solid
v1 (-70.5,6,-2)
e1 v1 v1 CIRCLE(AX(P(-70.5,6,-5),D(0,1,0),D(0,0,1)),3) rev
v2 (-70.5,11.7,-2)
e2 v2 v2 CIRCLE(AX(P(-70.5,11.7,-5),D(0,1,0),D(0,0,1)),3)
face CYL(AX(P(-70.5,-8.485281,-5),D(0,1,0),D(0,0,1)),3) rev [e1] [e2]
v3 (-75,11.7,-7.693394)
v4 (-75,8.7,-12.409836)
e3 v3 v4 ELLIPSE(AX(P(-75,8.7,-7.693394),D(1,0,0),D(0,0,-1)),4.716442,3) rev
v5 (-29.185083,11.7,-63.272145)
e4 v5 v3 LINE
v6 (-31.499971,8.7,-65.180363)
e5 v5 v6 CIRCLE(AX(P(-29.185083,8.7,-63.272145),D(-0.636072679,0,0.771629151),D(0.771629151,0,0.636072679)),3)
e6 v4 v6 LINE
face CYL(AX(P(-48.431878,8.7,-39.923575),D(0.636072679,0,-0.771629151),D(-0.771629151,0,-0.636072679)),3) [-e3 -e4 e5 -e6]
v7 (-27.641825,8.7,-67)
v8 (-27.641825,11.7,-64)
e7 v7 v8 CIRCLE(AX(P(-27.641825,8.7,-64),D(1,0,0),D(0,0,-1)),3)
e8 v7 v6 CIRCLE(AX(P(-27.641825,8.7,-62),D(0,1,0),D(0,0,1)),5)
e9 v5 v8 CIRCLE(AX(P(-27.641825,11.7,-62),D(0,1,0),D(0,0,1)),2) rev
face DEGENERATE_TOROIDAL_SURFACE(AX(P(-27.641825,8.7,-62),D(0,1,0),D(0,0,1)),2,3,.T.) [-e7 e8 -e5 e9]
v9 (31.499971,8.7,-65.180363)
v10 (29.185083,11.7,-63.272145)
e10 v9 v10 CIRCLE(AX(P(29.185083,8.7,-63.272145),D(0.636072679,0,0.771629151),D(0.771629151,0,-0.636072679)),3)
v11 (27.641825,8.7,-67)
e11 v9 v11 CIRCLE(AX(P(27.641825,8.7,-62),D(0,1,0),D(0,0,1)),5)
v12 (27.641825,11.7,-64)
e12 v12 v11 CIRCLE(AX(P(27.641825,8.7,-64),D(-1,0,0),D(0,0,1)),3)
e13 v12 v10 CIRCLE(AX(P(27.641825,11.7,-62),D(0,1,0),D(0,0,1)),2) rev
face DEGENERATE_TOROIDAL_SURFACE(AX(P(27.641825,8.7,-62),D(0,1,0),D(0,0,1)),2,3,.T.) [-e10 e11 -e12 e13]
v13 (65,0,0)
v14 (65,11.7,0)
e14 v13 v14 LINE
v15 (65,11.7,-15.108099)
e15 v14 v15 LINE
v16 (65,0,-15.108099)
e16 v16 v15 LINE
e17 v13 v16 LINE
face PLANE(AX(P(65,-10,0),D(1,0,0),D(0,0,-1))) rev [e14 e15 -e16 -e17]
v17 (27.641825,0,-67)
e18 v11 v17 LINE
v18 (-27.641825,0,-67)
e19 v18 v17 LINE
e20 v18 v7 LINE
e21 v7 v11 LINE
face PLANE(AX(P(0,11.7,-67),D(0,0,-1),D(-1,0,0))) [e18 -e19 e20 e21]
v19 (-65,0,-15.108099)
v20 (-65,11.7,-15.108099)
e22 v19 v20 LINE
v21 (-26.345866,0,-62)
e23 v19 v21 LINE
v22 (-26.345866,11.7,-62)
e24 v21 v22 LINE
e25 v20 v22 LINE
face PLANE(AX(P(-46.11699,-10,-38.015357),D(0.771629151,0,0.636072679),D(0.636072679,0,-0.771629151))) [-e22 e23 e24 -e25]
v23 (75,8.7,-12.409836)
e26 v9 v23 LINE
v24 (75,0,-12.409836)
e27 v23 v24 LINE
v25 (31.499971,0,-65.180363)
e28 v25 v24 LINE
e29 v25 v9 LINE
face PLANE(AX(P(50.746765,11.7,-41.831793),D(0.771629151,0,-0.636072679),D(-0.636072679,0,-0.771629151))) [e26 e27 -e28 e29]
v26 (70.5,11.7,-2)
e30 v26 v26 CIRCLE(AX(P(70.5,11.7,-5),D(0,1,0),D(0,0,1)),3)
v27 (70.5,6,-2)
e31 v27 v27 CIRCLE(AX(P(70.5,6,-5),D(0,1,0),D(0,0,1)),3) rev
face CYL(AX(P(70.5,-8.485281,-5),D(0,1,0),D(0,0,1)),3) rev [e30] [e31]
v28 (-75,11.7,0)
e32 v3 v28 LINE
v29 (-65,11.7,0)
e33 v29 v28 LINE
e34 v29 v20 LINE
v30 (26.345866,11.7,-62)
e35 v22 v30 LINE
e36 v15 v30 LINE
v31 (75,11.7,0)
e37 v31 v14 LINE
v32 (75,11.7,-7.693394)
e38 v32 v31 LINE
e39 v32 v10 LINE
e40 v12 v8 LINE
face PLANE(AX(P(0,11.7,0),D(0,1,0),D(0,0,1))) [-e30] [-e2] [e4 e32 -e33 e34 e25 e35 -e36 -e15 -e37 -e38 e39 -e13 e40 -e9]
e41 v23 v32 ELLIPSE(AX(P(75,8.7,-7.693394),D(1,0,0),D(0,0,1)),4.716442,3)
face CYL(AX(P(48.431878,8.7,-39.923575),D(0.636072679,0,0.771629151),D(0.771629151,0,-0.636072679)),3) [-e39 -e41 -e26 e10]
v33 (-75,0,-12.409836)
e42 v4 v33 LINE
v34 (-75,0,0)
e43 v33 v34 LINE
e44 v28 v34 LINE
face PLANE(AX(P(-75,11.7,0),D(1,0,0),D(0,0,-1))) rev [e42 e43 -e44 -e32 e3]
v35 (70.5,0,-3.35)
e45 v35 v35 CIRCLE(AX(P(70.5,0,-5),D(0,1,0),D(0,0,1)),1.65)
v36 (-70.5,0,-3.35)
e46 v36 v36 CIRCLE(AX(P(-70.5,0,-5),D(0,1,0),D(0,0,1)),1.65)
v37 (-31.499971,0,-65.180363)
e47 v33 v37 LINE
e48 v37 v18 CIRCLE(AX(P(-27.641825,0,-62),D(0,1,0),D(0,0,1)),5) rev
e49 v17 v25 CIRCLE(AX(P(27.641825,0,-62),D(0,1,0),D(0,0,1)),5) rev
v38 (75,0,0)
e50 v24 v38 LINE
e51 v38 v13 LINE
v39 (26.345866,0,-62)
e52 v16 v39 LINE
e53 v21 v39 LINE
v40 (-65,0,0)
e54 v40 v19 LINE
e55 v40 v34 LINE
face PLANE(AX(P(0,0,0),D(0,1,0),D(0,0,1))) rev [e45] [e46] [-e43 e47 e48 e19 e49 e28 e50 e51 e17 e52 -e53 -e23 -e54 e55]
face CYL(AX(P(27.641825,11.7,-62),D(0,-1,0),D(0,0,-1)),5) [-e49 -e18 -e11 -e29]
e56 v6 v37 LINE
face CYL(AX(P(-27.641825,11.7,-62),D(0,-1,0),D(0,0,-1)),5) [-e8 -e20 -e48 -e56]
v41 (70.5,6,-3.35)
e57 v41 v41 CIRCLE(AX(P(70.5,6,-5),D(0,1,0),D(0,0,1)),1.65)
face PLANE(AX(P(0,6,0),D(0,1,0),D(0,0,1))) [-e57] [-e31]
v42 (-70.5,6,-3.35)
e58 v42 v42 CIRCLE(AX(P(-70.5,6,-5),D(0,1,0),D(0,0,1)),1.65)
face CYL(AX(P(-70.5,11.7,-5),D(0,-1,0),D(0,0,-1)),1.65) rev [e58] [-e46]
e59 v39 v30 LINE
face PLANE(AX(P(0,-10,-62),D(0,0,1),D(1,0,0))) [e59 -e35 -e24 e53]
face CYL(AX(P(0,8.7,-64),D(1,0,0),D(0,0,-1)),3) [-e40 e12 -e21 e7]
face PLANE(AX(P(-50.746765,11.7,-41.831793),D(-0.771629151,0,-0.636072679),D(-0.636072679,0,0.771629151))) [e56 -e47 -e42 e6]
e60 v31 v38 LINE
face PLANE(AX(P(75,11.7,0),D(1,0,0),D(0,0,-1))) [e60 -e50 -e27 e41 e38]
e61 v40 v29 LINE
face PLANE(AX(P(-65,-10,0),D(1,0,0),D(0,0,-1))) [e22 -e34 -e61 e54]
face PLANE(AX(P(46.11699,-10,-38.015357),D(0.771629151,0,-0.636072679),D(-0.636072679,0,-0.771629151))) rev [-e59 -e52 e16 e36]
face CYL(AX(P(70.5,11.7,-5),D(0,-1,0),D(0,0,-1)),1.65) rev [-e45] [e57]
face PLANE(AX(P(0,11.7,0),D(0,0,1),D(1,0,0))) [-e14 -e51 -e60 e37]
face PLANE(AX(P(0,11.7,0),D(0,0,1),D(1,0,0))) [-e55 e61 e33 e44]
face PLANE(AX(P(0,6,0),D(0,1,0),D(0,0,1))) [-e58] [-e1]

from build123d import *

# Parameters (mm, degrees)
SKETCH1_R               = 1.65
BOSS_EXTRUDE1_DEPTH     = 11.7
CUT_EXTRUDE1_DEPTH      = 51
CUT_EXTRUDE1_DEPTH_BACK = 10
FILLET1_R               = 3
FILLET2_R               = 5
SKETCH3_R               = 3
CUT_EXTRUDE2_DEPTH      = 5.7


with BuildPart() as part:
    # Sketch1 → Boss-Extrude1 (new body)
    with BuildSketch(Plane(origin=(0, 0, 0), x_dir=(1, 0, 0), z_dir=(0, 1, 0))):
        Polygon((-22.5, 37), (22.5, 37), (53, 0), (75, 0), (75, 12.409836066), (30, 67), (-30, 67), (-75, 12.409836066), (-75, 0), (-53, 0), align=None)
        with Locations(Location((70.5, 5, 0), (0, 0, 270))):
            Circle(SKETCH1_R, mode=Mode.SUBTRACT)
        with Locations(Location((-70.5, 5, 0), (0, 0, 270))):
            Circle(SKETCH1_R, mode=Mode.SUBTRACT)
    extrude(amount=BOSS_EXTRUDE1_DEPTH)

    # Sketch2 → Cut-Extrude1 (cut, two sides: drawn at the far end of the back side and taken through both)
    with BuildSketch(Plane(origin=(0, 0, 0), x_dir=(1, 0, 0), z_dir=(0, 1, 0)).offset(-CUT_EXTRUDE1_DEPTH_BACK)):
        Polygon((-65, 15.108099284), (-65, 0), (-53, 0), (-22.5, 37), (0, 37), (0, 62), (-26.345865626, 62), align=None)
        Polygon((26.345865626, 62), (0, 62), (0, 37), (22.5, 37), (53, 0), (65, 0), (65, 15.108099284), align=None)
    extrude(amount=CUT_EXTRUDE1_DEPTH + CUT_EXTRUDE1_DEPTH_BACK, mode=Mode.SUBTRACT)

    # Fillet1
    fillet1_edges = [part.edges().sort_by_distance(p)[0] for p in [
        (52.5, 11.7, -39.704918033),
        (0, 11.7, -67),
        (-52.5, 11.7, -39.704918033),
    ]]
    fillet(fillet1_edges, radius=FILLET1_R)

    # Fillet2
    # the kernel refuses this fillet: 5 mm, written as the material it takes off along each edge
    with BuildSketch(Plane(origin=(27.641824959, 11.7, -62), x_dir=(0.7716291513697928, 0, -0.6360726788318559), z_dir=(0.6360726788318559, 0, 0.7716291513697928))) as fillet2_piece_1:
        with BuildLine():
            CenterArc((2, -3), 3, 0, 90)
            Line((5, -3), (5, 0))
            Line((5, 0), (2, 0))
        make_face()
    revolve(axis=Axis((27.641824959, 11.7, -62), (0, 1, 0)), revolution_arc=50.50041147, mode=Mode.SUBTRACT)
    with BuildSketch(Plane(origin=(-27.641824959, 11.7, -62), x_dir=(0, 0, -1), z_dir=(1, 0, 0))) as fillet2_piece_2:
        with BuildLine():
            CenterArc((2, -3), 3, 0, 90)
            Line((5, -3), (5, 0))
            Line((5, 0), (2, 0))
        make_face()
    revolve(axis=Axis((-27.641824959, 11.7, -62), (0, 1, 0)), revolution_arc=50.50041147, mode=Mode.SUBTRACT)
    with BuildSketch(Plane(origin=(-30, -5.895437603, -67), x_dir=(-0.6360726788318558, 0, 0.771629151369793), z_dir=(0, 1, 0)), Plane(origin=(30, -5.895437603, -67), x_dir=(-1, 0, 0), z_dir=(0, 1, 0))) as fillet2_piece_3:
        with BuildLine():
            CenterArc((FILLET2_R * 0.471635008245, FILLET2_R), FILLET2_R, 219.49958853, 50.50041147)
            Line((-FILLET2_R * 0.299994143125, FILLET2_R * 0.363927321168), (0, 0))
            Line((0, 0), (FILLET2_R * 0.471635008245, 0))
        make_face()
    extrude(amount=17.595437603, mode=Mode.SUBTRACT)

    # Sketch3 → Cut-Extrude2 (cut)
    with BuildSketch(Plane(origin=(0, 11.7, 0), x_dir=(1, 0, 0), z_dir=(0, 1, 0))):
        with Locations(Location((-70.5, 5, 0), (0, 0, 270))):
            Circle(SKETCH3_R)
        with Locations(Location((70.5, 5, 0), (0, 0, 270))):
            Circle(SKETCH3_R)
    extrude(amount=-CUT_EXTRUDE2_DEPTH, mode=Mode.SUBTRACT)


solid = part.part
